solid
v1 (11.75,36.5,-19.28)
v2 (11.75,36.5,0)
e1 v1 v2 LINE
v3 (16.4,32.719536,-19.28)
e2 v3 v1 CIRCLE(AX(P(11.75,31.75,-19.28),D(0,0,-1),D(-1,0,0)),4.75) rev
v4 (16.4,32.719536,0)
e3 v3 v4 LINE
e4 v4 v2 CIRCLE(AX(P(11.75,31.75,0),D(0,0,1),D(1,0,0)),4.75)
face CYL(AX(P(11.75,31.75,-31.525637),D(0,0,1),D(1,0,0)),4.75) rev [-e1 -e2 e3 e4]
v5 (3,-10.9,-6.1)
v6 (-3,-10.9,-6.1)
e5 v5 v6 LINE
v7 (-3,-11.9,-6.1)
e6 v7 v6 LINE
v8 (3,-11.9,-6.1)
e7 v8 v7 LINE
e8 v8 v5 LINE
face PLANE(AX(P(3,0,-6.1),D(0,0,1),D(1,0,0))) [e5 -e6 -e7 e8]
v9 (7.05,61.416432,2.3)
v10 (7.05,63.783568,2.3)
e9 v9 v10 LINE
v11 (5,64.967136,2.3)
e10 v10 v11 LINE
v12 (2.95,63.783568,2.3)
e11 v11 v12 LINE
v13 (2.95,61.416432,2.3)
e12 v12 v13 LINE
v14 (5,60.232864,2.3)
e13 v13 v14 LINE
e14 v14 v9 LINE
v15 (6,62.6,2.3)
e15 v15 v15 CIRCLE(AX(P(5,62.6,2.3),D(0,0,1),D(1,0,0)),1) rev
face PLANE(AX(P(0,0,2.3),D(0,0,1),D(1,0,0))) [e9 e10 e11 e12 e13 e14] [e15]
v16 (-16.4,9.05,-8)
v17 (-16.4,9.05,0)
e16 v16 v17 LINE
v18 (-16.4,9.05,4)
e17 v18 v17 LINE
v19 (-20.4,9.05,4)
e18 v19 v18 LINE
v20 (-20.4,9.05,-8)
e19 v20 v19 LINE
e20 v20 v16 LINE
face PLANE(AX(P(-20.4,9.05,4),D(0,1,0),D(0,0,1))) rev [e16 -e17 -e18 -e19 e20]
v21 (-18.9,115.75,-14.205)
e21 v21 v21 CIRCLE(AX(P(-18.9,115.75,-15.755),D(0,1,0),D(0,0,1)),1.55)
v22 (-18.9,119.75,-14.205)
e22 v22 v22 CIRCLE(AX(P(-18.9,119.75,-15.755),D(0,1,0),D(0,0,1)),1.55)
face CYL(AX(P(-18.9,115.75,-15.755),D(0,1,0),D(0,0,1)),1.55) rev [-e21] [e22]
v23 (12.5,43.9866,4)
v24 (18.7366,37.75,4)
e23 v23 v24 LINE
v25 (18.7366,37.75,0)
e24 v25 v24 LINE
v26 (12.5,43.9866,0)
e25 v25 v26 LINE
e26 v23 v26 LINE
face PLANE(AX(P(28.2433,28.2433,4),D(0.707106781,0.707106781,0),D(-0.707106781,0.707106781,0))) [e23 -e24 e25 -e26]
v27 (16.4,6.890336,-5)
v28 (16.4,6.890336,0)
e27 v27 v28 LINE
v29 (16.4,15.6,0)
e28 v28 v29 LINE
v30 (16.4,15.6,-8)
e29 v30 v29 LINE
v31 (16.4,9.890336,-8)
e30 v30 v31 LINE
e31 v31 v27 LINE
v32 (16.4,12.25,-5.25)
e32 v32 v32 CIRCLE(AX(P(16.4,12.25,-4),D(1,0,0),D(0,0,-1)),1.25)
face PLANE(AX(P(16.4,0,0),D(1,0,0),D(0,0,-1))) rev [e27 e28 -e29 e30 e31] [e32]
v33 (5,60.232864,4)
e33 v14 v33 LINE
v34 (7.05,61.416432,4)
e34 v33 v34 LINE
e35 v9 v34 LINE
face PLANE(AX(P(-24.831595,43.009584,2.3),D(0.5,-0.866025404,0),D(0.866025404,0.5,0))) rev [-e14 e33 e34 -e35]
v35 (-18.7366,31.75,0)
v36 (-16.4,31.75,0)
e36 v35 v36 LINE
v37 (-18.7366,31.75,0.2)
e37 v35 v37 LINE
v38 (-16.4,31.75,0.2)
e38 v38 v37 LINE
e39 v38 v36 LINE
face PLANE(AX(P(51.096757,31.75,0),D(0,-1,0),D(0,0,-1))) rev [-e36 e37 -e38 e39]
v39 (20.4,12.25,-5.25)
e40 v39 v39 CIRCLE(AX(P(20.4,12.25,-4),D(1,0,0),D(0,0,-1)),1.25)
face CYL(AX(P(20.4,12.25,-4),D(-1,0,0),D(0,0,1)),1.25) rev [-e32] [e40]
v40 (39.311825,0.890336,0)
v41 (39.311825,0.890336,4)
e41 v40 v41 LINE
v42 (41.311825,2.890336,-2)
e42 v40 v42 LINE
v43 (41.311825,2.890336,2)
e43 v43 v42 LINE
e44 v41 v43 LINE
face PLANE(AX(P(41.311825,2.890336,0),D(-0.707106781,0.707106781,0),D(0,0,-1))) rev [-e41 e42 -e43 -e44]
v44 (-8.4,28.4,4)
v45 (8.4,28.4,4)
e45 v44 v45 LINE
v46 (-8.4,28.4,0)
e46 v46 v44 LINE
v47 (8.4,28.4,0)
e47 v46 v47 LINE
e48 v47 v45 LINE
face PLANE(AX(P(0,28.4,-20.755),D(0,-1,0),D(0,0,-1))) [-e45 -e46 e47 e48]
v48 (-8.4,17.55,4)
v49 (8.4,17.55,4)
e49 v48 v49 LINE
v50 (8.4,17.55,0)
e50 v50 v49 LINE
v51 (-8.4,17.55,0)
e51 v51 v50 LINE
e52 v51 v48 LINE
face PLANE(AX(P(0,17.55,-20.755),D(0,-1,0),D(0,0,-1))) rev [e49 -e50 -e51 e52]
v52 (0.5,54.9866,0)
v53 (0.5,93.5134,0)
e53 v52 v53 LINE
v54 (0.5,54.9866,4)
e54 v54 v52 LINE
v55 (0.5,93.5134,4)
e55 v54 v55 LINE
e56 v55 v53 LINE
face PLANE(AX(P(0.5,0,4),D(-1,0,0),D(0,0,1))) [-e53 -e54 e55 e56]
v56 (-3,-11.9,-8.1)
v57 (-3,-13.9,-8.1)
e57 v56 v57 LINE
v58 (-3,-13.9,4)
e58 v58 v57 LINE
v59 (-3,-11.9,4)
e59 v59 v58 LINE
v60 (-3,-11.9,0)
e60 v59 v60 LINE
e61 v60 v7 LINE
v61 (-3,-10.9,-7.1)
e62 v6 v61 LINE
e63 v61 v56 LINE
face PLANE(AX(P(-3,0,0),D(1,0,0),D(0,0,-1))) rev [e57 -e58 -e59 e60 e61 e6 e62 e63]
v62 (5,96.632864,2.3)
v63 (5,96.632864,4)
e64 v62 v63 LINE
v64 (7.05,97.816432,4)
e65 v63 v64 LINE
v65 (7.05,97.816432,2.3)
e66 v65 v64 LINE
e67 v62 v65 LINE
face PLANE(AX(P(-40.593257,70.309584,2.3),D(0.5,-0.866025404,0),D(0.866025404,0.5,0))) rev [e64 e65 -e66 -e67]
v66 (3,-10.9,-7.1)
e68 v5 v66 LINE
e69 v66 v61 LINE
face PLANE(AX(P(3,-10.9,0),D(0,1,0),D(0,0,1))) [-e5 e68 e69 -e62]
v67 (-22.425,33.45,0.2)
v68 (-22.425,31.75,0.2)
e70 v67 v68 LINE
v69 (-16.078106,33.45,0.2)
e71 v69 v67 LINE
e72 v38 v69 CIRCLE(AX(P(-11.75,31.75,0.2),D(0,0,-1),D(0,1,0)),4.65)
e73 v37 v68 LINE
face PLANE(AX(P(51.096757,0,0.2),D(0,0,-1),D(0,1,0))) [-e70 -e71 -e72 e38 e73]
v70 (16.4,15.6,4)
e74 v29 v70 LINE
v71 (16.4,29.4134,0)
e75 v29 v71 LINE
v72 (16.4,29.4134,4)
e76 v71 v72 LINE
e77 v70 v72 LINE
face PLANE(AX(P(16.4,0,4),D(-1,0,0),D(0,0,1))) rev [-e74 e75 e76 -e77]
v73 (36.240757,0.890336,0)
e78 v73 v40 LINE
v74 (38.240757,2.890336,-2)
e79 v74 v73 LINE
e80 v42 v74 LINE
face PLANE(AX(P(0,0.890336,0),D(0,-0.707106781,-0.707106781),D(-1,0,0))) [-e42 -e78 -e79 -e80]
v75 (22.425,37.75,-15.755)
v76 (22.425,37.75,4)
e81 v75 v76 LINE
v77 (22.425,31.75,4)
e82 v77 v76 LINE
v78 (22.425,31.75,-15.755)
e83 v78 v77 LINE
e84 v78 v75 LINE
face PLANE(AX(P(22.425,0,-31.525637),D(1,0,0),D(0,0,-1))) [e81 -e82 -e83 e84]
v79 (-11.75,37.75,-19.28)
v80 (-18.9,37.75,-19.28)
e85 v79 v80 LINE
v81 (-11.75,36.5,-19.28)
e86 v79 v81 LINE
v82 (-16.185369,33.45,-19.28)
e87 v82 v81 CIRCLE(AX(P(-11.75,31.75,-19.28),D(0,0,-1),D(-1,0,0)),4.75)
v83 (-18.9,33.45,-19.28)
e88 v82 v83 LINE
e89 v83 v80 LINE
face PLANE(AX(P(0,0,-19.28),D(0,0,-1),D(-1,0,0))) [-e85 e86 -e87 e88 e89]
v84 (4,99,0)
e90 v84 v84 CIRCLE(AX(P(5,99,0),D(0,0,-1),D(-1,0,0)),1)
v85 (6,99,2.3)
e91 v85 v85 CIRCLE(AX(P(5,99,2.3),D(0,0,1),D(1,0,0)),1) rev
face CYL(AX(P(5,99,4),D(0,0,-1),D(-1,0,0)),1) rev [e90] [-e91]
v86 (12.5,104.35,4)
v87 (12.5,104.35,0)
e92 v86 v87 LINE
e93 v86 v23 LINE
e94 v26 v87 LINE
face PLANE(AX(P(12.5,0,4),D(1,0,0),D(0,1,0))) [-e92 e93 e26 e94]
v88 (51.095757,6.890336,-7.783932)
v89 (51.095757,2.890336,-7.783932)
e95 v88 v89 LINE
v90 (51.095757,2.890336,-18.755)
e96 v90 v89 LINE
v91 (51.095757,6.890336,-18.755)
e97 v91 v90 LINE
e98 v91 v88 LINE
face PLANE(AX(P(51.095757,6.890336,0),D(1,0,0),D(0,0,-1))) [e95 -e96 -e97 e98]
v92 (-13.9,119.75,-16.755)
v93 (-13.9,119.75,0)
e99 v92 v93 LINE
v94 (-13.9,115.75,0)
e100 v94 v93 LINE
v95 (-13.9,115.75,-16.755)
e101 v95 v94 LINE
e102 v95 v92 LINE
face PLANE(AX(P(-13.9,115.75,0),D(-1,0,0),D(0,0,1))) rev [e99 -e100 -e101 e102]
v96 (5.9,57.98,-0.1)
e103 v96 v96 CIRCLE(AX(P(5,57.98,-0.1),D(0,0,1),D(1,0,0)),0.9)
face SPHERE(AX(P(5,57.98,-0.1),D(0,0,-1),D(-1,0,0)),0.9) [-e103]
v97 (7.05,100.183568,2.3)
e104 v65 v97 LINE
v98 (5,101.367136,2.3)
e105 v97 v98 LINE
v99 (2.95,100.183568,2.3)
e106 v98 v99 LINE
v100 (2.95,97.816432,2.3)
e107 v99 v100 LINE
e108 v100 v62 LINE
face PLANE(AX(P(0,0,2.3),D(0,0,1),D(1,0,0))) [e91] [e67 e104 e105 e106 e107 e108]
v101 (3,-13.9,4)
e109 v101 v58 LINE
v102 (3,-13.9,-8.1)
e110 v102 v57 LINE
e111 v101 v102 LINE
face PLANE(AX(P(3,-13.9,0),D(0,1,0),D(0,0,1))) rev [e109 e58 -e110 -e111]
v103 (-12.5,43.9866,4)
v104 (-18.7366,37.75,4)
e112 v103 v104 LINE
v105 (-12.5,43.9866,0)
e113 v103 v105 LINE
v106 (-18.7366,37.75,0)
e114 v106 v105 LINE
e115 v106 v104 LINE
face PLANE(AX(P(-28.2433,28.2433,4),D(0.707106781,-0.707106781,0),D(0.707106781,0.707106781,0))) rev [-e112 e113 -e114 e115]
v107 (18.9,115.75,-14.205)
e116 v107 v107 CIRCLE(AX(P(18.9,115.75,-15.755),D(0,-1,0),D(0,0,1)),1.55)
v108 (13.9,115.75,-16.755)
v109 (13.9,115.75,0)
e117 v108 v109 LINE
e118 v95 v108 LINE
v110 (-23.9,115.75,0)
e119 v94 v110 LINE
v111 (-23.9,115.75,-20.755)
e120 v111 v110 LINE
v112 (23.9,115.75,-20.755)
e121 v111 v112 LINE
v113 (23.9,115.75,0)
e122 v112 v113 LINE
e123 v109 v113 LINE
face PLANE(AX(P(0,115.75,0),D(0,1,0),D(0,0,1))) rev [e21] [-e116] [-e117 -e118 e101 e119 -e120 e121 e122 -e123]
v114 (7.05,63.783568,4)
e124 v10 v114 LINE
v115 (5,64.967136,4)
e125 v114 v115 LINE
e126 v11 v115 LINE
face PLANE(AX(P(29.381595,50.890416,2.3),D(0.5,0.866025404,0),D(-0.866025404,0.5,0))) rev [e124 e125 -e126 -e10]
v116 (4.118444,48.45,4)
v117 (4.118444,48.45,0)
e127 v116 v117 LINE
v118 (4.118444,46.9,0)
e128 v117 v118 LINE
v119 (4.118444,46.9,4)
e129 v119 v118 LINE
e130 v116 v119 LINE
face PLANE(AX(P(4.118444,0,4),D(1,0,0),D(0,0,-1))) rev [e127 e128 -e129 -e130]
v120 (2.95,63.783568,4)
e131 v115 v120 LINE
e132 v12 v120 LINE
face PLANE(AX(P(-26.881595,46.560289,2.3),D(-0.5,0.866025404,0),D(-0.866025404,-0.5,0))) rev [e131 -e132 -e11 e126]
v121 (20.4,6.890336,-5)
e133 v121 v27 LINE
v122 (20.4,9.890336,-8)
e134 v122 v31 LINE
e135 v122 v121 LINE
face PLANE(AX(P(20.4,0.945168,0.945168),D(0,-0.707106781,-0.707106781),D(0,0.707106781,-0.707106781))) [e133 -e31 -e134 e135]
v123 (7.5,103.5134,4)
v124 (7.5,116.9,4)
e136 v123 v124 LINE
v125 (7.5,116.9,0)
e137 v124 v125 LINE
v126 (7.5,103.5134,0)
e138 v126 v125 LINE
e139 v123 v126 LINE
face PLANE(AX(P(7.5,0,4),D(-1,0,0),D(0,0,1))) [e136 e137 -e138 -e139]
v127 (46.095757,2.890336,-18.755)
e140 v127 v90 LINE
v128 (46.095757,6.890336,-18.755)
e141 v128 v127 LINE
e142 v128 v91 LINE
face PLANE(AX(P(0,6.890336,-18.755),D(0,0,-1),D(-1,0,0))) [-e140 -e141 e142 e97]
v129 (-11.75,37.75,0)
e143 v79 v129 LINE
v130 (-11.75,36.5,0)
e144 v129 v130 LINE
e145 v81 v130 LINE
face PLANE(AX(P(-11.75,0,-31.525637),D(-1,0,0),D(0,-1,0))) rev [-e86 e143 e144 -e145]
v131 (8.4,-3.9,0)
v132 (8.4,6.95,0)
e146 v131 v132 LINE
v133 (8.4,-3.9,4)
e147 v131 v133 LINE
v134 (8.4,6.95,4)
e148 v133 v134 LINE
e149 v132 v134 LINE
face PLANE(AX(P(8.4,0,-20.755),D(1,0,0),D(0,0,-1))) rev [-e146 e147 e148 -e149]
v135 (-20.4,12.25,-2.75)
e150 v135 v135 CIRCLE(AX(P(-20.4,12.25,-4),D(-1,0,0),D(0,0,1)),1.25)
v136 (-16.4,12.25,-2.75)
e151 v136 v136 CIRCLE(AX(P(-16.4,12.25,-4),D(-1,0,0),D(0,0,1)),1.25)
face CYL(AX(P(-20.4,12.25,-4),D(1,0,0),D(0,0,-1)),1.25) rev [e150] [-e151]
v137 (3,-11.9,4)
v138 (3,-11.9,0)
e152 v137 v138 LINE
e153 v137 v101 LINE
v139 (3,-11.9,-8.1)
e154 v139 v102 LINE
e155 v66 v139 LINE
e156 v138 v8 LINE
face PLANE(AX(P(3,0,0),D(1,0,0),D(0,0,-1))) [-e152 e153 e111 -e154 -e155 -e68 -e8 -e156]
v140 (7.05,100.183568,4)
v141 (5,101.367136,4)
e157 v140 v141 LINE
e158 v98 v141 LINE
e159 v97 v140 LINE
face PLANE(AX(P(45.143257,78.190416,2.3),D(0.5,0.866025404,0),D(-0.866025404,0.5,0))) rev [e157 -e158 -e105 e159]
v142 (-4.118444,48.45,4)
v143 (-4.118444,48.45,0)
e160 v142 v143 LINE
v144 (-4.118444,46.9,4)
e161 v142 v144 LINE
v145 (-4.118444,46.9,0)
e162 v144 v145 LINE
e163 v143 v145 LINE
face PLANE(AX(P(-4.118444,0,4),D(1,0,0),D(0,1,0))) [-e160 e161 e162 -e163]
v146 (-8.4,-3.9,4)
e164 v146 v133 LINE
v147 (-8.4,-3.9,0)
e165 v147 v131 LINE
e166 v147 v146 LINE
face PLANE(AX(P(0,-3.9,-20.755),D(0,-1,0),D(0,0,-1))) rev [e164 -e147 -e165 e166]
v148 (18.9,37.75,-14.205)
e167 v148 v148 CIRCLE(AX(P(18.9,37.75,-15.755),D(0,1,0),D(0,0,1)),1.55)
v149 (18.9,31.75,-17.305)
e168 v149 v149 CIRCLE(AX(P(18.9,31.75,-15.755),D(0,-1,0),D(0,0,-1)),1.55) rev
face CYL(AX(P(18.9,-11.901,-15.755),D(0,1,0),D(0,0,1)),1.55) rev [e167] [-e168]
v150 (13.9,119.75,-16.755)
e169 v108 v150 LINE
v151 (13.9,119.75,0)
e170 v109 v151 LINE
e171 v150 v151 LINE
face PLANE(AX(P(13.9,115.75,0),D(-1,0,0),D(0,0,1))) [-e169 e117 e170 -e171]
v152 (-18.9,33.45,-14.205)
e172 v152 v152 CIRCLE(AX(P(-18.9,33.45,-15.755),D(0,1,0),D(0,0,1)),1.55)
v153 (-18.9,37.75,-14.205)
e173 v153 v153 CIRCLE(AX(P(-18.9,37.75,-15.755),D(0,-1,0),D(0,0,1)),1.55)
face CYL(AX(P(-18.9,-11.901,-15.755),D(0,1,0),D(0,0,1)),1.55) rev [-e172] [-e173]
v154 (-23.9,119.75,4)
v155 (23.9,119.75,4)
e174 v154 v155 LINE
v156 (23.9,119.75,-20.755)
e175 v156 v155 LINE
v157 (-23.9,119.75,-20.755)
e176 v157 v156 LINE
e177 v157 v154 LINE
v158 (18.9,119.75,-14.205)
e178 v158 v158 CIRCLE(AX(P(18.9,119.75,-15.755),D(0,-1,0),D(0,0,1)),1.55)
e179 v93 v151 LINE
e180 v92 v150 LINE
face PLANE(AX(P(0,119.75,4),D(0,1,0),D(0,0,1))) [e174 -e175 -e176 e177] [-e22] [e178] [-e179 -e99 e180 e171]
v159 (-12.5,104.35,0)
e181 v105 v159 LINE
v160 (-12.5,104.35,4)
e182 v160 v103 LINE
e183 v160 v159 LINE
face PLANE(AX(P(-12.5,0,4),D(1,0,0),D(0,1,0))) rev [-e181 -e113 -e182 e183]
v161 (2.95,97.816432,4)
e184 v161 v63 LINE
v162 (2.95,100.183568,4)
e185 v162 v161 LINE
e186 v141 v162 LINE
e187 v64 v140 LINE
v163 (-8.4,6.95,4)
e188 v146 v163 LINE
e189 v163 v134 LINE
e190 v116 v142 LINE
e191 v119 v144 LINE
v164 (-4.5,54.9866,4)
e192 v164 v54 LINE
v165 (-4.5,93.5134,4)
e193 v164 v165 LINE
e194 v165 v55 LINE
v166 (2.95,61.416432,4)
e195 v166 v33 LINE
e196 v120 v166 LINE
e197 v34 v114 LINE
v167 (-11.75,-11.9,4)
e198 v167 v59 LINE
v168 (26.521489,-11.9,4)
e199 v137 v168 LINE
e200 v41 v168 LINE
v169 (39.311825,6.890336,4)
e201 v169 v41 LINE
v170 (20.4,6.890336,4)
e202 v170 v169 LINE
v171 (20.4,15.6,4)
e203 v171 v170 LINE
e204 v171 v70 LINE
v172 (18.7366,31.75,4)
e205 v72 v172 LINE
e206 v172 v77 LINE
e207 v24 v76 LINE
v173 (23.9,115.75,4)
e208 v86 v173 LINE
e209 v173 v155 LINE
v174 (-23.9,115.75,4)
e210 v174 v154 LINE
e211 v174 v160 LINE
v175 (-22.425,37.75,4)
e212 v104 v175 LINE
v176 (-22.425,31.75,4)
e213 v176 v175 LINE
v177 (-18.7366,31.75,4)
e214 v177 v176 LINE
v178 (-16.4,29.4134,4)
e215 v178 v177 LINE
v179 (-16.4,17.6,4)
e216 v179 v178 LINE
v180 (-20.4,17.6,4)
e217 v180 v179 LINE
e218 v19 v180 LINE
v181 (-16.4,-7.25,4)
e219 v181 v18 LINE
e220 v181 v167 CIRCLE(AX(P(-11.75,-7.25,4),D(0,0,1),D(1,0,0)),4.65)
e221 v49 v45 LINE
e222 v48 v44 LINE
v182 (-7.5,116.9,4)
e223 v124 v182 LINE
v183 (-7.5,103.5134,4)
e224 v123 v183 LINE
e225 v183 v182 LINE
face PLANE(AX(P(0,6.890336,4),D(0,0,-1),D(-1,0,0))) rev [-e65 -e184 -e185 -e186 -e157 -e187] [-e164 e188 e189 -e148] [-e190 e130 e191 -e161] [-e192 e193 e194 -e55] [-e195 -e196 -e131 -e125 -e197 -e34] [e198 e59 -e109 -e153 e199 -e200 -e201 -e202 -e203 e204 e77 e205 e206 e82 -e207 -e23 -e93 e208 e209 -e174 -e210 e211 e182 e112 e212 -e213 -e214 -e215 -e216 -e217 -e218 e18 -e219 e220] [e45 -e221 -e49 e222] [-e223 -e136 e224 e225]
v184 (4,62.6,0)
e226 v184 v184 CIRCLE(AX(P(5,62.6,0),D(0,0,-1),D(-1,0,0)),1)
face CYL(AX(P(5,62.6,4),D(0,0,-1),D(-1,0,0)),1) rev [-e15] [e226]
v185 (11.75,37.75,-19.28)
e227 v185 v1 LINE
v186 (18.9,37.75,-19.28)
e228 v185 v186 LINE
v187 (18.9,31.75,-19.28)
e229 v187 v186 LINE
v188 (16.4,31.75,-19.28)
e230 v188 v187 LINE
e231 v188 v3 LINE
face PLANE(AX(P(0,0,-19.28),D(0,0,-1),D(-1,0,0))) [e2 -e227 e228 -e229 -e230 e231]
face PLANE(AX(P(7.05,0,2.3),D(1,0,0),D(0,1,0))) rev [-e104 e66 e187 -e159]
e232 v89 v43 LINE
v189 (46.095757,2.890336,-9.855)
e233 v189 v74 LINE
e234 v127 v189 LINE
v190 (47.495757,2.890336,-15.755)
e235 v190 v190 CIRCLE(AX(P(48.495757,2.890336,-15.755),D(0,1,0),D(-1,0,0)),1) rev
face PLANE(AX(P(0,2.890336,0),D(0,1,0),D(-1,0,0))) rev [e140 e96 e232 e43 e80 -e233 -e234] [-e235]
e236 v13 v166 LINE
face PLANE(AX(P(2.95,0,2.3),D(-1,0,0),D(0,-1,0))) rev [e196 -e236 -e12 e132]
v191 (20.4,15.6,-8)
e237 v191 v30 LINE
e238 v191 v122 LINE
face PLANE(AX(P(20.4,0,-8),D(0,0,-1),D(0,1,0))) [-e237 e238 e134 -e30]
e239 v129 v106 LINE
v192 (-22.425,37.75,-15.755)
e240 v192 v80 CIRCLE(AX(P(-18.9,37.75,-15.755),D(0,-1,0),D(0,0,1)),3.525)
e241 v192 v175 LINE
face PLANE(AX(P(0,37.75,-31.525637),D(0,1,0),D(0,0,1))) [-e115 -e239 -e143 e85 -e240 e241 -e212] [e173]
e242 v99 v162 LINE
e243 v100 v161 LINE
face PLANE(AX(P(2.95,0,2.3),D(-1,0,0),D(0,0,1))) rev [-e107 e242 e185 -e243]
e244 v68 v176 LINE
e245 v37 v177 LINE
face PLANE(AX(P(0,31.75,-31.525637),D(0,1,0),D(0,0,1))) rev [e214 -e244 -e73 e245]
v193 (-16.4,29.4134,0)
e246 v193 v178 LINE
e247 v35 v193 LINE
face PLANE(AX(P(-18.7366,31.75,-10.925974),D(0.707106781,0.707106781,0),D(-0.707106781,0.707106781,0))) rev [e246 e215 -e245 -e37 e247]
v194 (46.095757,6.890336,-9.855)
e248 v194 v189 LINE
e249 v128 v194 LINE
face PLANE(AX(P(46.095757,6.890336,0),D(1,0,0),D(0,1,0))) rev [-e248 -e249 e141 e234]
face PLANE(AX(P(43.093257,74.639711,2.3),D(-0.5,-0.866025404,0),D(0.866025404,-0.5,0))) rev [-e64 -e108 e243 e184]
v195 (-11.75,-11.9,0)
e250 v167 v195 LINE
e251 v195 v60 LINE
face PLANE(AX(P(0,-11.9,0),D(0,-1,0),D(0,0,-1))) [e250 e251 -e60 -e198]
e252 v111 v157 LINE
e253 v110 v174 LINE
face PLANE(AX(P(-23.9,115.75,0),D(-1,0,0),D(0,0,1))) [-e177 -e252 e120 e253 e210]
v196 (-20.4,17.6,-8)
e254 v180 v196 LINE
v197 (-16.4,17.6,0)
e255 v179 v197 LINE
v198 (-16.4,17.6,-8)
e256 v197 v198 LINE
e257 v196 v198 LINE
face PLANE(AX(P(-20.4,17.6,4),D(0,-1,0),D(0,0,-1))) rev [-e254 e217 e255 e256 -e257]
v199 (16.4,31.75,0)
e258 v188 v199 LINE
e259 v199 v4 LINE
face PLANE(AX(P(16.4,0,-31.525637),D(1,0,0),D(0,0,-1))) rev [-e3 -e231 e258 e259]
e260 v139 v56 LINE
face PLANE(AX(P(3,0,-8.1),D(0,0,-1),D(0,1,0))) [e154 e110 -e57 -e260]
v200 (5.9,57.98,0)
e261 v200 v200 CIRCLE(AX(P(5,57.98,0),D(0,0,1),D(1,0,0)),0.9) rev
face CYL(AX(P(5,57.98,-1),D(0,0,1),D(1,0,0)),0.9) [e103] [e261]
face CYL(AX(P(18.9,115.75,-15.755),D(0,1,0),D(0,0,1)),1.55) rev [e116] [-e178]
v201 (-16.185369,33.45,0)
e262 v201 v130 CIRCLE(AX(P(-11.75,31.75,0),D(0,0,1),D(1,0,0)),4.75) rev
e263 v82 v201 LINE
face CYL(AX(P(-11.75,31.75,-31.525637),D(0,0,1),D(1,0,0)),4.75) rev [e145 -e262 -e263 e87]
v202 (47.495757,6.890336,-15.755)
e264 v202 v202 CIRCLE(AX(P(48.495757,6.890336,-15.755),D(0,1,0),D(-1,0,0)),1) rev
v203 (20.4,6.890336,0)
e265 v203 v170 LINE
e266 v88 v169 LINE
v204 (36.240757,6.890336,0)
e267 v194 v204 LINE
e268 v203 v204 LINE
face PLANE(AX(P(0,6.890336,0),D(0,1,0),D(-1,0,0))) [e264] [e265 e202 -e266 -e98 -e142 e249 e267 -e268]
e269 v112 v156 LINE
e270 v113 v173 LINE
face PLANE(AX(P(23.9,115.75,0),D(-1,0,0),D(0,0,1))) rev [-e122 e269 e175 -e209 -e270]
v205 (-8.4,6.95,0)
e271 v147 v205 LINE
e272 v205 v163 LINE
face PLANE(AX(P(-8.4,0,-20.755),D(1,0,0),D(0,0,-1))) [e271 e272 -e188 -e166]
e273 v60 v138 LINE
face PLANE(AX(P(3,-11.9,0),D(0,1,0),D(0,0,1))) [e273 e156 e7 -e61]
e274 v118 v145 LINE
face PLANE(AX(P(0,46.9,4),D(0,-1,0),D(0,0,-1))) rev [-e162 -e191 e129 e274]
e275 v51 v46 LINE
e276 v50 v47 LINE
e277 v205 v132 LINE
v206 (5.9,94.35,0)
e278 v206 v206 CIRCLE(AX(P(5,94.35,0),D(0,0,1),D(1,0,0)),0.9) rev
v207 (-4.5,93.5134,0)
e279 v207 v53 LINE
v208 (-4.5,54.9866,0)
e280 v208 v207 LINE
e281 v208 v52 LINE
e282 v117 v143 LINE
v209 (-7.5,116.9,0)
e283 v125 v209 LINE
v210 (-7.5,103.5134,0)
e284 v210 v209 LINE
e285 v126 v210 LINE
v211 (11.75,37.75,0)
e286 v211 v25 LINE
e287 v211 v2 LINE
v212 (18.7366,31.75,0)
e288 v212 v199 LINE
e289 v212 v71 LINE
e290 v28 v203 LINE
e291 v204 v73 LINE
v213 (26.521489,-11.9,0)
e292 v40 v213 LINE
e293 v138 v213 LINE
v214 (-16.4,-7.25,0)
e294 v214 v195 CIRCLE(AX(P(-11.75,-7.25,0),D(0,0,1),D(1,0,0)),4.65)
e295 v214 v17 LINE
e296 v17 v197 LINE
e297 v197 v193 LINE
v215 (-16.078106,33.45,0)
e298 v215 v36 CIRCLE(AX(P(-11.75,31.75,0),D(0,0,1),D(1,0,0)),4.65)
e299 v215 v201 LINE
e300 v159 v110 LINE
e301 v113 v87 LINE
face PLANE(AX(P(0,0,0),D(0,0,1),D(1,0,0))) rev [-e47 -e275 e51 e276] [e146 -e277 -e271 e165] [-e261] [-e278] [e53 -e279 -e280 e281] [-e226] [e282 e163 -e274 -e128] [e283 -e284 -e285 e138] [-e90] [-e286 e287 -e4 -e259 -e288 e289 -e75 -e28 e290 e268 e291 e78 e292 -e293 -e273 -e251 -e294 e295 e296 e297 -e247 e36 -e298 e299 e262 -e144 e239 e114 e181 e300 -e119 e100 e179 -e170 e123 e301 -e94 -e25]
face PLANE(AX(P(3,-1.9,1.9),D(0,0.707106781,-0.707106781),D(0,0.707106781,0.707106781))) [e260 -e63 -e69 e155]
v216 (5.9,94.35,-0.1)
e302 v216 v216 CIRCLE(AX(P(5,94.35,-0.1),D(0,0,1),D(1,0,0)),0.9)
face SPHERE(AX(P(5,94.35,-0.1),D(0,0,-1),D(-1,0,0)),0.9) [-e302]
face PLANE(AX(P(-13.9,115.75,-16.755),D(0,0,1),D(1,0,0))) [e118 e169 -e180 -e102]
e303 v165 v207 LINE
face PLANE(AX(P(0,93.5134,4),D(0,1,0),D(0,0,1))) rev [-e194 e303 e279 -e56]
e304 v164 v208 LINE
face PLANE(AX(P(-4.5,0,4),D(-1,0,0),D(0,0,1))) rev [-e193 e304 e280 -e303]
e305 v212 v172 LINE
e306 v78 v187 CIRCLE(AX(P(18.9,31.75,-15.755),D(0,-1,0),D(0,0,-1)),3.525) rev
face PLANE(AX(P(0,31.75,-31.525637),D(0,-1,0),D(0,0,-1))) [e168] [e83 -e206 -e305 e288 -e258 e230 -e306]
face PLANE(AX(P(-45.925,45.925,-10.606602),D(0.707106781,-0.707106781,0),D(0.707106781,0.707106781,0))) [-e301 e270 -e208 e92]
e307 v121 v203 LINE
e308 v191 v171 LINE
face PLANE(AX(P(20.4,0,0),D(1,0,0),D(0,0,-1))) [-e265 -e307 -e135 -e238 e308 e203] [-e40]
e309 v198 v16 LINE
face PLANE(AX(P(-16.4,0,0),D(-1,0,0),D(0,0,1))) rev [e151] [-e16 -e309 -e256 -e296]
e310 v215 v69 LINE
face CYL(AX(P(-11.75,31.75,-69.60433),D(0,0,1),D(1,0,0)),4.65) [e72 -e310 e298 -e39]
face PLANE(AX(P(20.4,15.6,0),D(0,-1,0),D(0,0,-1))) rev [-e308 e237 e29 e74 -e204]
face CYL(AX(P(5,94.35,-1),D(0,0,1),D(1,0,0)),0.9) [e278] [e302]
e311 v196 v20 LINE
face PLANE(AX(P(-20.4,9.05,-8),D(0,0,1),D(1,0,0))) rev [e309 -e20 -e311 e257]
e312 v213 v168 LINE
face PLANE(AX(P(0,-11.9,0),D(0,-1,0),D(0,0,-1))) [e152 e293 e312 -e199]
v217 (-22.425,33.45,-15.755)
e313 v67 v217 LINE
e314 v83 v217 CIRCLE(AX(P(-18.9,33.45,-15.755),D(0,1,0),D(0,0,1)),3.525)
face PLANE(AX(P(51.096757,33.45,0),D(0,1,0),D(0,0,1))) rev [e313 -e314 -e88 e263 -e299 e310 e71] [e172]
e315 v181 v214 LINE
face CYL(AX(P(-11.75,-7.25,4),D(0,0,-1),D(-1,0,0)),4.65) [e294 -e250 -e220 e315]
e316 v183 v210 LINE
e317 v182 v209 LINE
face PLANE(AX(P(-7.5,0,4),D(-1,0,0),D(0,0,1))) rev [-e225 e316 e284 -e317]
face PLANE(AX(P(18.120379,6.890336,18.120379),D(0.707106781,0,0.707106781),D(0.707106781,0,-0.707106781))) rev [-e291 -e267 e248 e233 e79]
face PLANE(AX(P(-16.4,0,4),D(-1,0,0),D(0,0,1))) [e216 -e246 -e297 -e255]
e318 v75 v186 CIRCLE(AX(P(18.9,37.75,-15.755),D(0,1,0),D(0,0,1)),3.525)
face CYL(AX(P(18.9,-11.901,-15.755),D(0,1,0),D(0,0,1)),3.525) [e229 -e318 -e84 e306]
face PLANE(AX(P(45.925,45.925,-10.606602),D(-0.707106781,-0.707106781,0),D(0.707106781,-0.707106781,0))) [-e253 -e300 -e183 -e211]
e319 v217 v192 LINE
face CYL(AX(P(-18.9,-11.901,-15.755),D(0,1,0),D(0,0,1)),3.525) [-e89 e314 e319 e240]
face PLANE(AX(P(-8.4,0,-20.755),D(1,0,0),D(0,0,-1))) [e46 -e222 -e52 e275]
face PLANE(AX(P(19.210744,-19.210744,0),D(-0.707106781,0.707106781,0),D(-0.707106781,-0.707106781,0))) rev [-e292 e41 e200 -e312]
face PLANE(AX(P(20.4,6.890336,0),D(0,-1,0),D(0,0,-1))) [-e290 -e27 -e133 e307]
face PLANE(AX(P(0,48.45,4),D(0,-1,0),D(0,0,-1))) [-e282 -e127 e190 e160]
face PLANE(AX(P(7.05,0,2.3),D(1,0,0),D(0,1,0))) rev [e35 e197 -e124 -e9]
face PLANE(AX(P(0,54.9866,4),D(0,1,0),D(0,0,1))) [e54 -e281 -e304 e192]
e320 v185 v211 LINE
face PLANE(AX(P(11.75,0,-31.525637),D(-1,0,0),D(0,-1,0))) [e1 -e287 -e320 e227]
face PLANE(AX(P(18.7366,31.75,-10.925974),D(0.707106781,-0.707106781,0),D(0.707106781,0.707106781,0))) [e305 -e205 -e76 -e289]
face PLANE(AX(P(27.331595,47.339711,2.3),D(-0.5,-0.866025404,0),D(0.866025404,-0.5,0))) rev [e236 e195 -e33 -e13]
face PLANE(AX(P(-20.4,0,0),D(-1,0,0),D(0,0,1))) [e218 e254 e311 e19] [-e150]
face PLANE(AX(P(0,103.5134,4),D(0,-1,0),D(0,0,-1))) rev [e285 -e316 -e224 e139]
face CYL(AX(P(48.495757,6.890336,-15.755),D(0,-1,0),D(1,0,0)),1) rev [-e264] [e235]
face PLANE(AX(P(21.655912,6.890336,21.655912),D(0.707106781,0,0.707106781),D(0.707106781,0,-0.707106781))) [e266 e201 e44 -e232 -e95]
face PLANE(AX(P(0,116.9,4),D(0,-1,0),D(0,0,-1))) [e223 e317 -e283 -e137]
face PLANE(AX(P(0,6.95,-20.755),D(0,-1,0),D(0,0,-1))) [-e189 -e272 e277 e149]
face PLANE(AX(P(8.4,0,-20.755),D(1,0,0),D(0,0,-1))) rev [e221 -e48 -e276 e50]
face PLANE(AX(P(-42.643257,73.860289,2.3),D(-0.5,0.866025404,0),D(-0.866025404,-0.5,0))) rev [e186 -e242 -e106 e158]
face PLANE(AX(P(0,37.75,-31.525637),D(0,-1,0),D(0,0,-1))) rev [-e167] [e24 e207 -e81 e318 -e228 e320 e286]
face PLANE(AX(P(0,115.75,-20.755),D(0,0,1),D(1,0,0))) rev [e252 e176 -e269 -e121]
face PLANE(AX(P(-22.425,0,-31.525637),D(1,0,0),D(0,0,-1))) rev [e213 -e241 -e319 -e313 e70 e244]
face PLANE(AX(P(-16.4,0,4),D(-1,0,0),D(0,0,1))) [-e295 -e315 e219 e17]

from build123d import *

# Parameters (mm, degrees)
EXTRUDE_1_DEPTH     = 4
SKETCH_2_W          = 15
SKETCH_2_H          = 13.3866
CUT_EXTRUDE_1_DEPTH = 121.93395925
SKETCH_3_W          = 10
SKETCH_3_H          = 10
SKETCH_3_R          = 1.55
SKETCH_3_H_2        = 14.755
EXTRUDE_2_DEPTH     = 4
EXTRUDE_3_DEPTH     = 4
EXTRUDE_4_DEPTH     = 4
SKETCH_7_W          = 27.8
SKETCH_7_H          = 4
EXTRUDE_5_DEPTH     = 4
EXTRUDE_START       = -4
EXTRUDE_6_DEPTH     = 4
SKETCH_11_W         = 16.8
SKETCH_11_H         = 10.85
CUT_EXTRUDE_2_DEPTH = 133.52791749
CHAMFER_1_SIZE      = 2
CHAMFER_2_SIZE      = 2
SKETCH_12_W         = 12
SKETCH_12_H         = 8.55
SKETCH_12_R         = 1.25
EXTRUDE_7_DEPTH     = 4
EXTRUDE_START_2     = 4
SKETCH_13_R         = 1.25
SKETCH_13_W         = 4
SKETCH_13_H         = 8.709663749
EXTRUDE_8_DEPTH     = 4
SKETCH_14_R         = 1
CUT_EXTRUDE_3_DEPTH = 132.839329922
SKETCH_15_R         = 0.9
EXTRUDE_9_DEPTH     = 1
FILLET_1_R          = 0.9
CUT_EXTRUDE_START   = -1.7
SKETCH_16_R         = 1
CUT_EXTRUDE_4_DEPTH = 1.7
CUT_EXTRUDE_5_DEPTH = 132.839329922
SKETCH_19_W         = 5
SKETCH_19_H         = 38.5268
SKETCH_19_W_2       = 8.236887868
SKETCH_19_H_2       = 1.55
CUT_EXTRUDE_6_DEPTH = 132.839329922
EXTRUDE_12_DEPTH    = 23.28
CUT_EXTRUDE_7_REACH = 100.821
SKETCH_23_R         = 1.55
EXTRUDE_13_DEPTH    = 4
CUT_EXTRUDE_START_2 = -19.28
CUT_EXTRUDE_8_DEPTH = 19.48
SKETCH_26_W         = 10.1
SKETCH_26_H         = 2
EXTRUDE_14_DEPTH    = 3


# Read off the part's stored shape, not the designer's step: 切除-拉伸8
with BuildPart() as part:
    # 草图1 → 凸台-拉伸1 (new body)
    with BuildSketch(Plane.XY):
        with BuildLine():
            Line((-16.4, -7.25), (-16.4, 119.75))
            Line((-16.4, 119.75), (16.4, 119.75))
            Line((16.4, 119.75), (16.4, -7.25))
            ThreePointArc((16.4, -7.25), (15.038046533, -10.538046533), (11.75, -11.9))
            Line((11.75, -11.9), (-11.75, -11.9))
            ThreePointArc((-11.75, -11.9), (-15.038046533, -10.538046533), (-16.4, -7.25))
        make_face()
    extrude(amount=EXTRUDE_1_DEPTH)

    # 草图2 → 切除-拉伸1 (cut, through all)
    with BuildSketch(Plane(origin=(0, 0, 0), x_dir=(-1, 0, 0), z_dir=(0, 0, -1))):
        with Locations((0, 110.2067)):
            Rectangle(SKETCH_2_W, SKETCH_2_H)
    extrude(amount=-CUT_EXTRUDE_1_DEPTH, mode=Mode.SUBTRACT)

    # 草图3 → 凸台-拉伸2 (add)
    # profile 1 of 2: a face of its own
    with BuildSketch(Plane(origin=(0, 119.75, 0), x_dir=(1, 0, 0), z_dir=(0, 1, 0))):
        with Locations((-18.9, 15.755)):
            Rectangle(SKETCH_3_W, SKETCH_3_H)
        with Locations(Location((-18.9, 15.755, 0), (0, 0, 270))):
            Circle(SKETCH_3_R, mode=Mode.SUBTRACT)
    # profile 2 of 2: a face of its own
    with BuildSketch(Plane(origin=(0, 119.75, 0), x_dir=(1, 0, 0), z_dir=(0, 1, 0))):
        with Locations((-18.9, 3.3775)):
            Rectangle(SKETCH_3_W, SKETCH_3_H_2)
    extrude_2 = extrude(amount=-EXTRUDE_2_DEPTH)

    # 镜向1: 凸台-拉伸2 across plane
    add(extrude_2.mirror(Plane(origin=(0, 0, 0), x_dir=(0, 0, 1), z_dir=(1, 0, 0))))

    # 草图6 → 凸台-拉伸4 (add)
    with BuildSketch(Plane.XY.offset(4)):
        Polygon((-16.4, 115.75), (-23.9, 115.75), (-16.4, 108.25), align=None)
        Polygon((16.4, 115.75), (16.4, 108.25), (23.9, 115.75), align=None)
    extrude(amount=-EXTRUDE_4_DEPTH)

    # 草图7 → 凸台-拉伸5 (add)
    with BuildSketch(Plane(origin=(0, 119.75, 0), x_dir=(1, 0, 0), z_dir=(0, 1, 0))):
        with Locations((0, 18.755)):
            Rectangle(SKETCH_7_W, SKETCH_7_H)
    extrude(amount=-EXTRUDE_5_DEPTH)



with BuildPart() as body_2:
    # 草图5 → 凸台-拉伸3 (new body)
    with BuildSketch(Plane(origin=(0, 2.890336251, 0), x_dir=(1, 0, 0), z_dir=(0, 1, 0))):
        Polygon((50.795757056, 9.855), (46.095757056, 9.855), (32.240757056, -4), (39.311824868, -4), (51.095757056, 7.783932188), (51.095757056, 9.855), align=None)
        with BuildLine():
            Line((50.795757056, 18.755), (46.095757056, 18.755))
            Line((46.095757056, 18.755), (46.095757056, 9.855))
            Line((46.095757056, 9.855), (50.795757056, 9.855))
            Line((50.795757056, 9.855), (50.795757056, 15.105))
            Line((50.795757056, 15.105), (49.255691264, 15.105))
            ThreePointArc((49.255691264, 15.105), (47.495757056, 15.755), (49.255691264, 16.405))
            Line((49.255691264, 16.405), (50.795757056, 16.405))
            Line((50.795757056, 16.405), (50.795757056, 18.755))
        make_face()
        with BuildLine():
            Line((51.095757056, 18.755), (50.795757056, 18.755))
            Line((50.795757056, 18.755), (50.795757056, 16.405))
            Line((50.795757056, 16.405), (49.255691264, 16.405))
            ThreePointArc((49.255691264, 16.405), (49.433822674, 16.10145764), (49.495757056, 15.755))
            ThreePointArc((49.495757056, 15.755), (49.433822674, 15.40854236), (49.255691264, 15.105))
            Line((49.255691264, 15.105), (50.795757056, 15.105))
            Line((50.795757056, 15.105), (50.795757056, 9.855))
            Line((50.795757056, 9.855), (51.095757056, 9.855))
            Line((51.095757056, 9.855), (51.095757056, 18.755))
        make_face()
    extrude(amount=EXTRUDE_3_DEPTH)


with BuildPart() as part_1:
    add(part.part)

    add(body_2.part)  # 凸台-拉伸6 merges body 2
    # 草图8 → 凸台-拉伸6 (add)
    with BuildSketch(Plane.XY.offset(4).offset(EXTRUDE_START)):
        with BuildLine():
            Line((26.521488617, -11.9), (39.311824868, 0.890336251))
            Line((39.311824868, 0.890336251), (39.311824868, 6.890336251))
            Line((39.311824868, 6.890336251), (16.4, 6.890336251))
            Line((16.4, 6.890336251), (16.4, -7.25))
            ThreePointArc((16.4, -7.25), (15.038046533, -10.538046533), (11.75, -11.9))
            Line((11.75, -11.9), (26.521488617, -11.9))
        make_face()
    extrude(amount=EXTRUDE_6_DEPTH)

    # 草图11 → 切除-拉伸2 (cut, through all)
    with BuildSketch(Plane.XY.offset(4)):
        with Locations((0, 1.525)):
            Rectangle(SKETCH_11_W, SKETCH_11_H)
        with Locations((0, 22.975)):
            Rectangle(SKETCH_11_W, SKETCH_11_H)
    extrude(amount=-CUT_EXTRUDE_2_DEPTH, mode=Mode.SUBTRACT)

    # 倒角1
    chamfer_1_edges = [part_1.edges().sort_by_distance(p)[0] for p in [
        (39.311824868, 2.890336251, 2),
    ]]
    chamfer(chamfer_1_edges, length=CHAMFER_1_SIZE - 0.0001)  # a hair under: the kernel refuses the full size

    # 倒角2
    chamfer_2_edges = [part_1.edges().sort_by_distance(p)[0] for p in [
        (38.776240962, 2.890336251, 0),
    ]]
    chamfer(chamfer_2_edges, length=CHAMFER_2_SIZE - 0.0001)  # a hair under: the kernel refuses the full size

    # 草图12 → 凸台-拉伸7 (add)
    with BuildSketch(Plane.ZY.offset(16.4)):
        with Locations((-2, 13.325)):
            Rectangle(SKETCH_12_W, SKETCH_12_H)
        with Locations((-4, 12.25)):
            Circle(SKETCH_12_R, mode=Mode.SUBTRACT)
    extrude(amount=EXTRUDE_7_DEPTH)

    # 草图13 → 凸台-拉伸8 (add)
    # profile 1 of 2: a face of its own
    with BuildSketch(Plane(origin=(16.4, 0, 0), x_dir=(0, 0, -1), z_dir=(1, 0, 0)).offset(EXTRUDE_START_2)):
        Polygon((8, 9.890336251), (8, 15.6), (0, 15.6), (0, 6.890336251), (5, 6.890336251), align=None)
        with Locations(Location((4, 12.25, 0), (0, 0, 180))):
            Circle(SKETCH_13_R, mode=Mode.SUBTRACT)
    # profile 2 of 2: a face of its own
    with BuildSketch(Plane(origin=(16.4, 0, 0), x_dir=(0, 0, -1), z_dir=(1, 0, 0)).offset(EXTRUDE_START_2)):
        with Locations((-2, 11.245168126)):
            Rectangle(SKETCH_13_W, SKETCH_13_H)
    extrude(amount=-EXTRUDE_8_DEPTH)

    # 草图14 → 切除-拉伸3 (cut, through all)
    with BuildSketch(Plane(origin=(0, 0, 0), x_dir=(-1, 0, 0), z_dir=(0, 0, -1))):
        with Locations((-5, 62.6)):
            Circle(SKETCH_14_R)
        with Locations((-5, 99)):
            Circle(SKETCH_14_R)
    extrude(amount=-CUT_EXTRUDE_3_DEPTH, mode=Mode.SUBTRACT)

    # 草图15 → 凸台-拉伸9 (add)
    with BuildSketch(Plane(origin=(0, 0, 0), x_dir=(-1, 0, 0), z_dir=(0, 0, -1))):
        with Locations(Location((-5, 94.35, 0), (0, 0, 180))):
            Circle(SKETCH_15_R)
        with Locations(Location((-5, 57.98, 0), (0, 0, 180))):
            Circle(SKETCH_15_R)
    extrude(amount=EXTRUDE_9_DEPTH)

    # 圆角1
    fillet_1_edges = [part_1.edges().sort_by_distance(p)[0] for p in [
        (4.1, 94.35, -1),
        (4.1, 57.98, -1),
    ]]
    fillet(fillet_1_edges, radius=FILLET_1_R)

    # 草图16 → 切除-拉伸4 (cut)
    # profile 1 of 2: a face of its own
    with BuildSketch(Plane.XY.offset(4).offset(CUT_EXTRUDE_START)):
        Polygon((7.05, 61.416431948), (7.05, 63.783568052), (5, 64.967136104), (2.95, 63.783568052), (2.95, 61.416431948), (5, 60.232863896), align=None)
        with Locations(Location((5, 62.6, 0), (0, 0, 180))):
            Circle(SKETCH_16_R, mode=Mode.SUBTRACT)
    # profile 2 of 2: a face of its own
    with BuildSketch(Plane.XY.offset(4).offset(CUT_EXTRUDE_START)):
        Polygon((2.95, 97.816431948), (5, 96.632863896), (7.05, 97.816431948), (7.05, 100.183568052), (5, 101.367136104), (2.95, 100.183568052), align=None)
        with Locations(Location((5, 99, 0), (0, 0, 180))):
            Circle(SKETCH_16_R, mode=Mode.SUBTRACT)
    extrude(amount=CUT_EXTRUDE_4_DEPTH, mode=Mode.SUBTRACT)

    # 草图17 → 切除-拉伸5 (cut, symmetric)
    with BuildSketch(Plane(origin=(0, 0, 0), x_dir=(-1, 0, 0), z_dir=(0, 0, -1))):
        Polygon((-12.5, 104.35), (-16.4, 108.25), (-16.4, 40.0866), (-12.5, 43.9866), align=None)
    cut_extrude_5 = extrude(amount=CUT_EXTRUDE_5_DEPTH, both=True, mode=Mode.SUBTRACT)

    # 镜向2: 切除-拉伸5 across plane
    add(cut_extrude_5.mirror(Plane(origin=(0, 0, 0), x_dir=(0, 0, 1), z_dir=(1, 0, 0))), mode=Mode.SUBTRACT)

    # 草图19 → 切除-拉伸6 (cut, through all)
    with BuildSketch(Plane(origin=(0, 0, 0), x_dir=(-1, 0, 0), z_dir=(0, 0, -1))):
        with Locations((2, 74.25)):
            Rectangle(SKETCH_19_W, SKETCH_19_H)
        with Locations((0, 47.675)):
            Rectangle(SKETCH_19_W_2, SKETCH_19_H_2)
    extrude(amount=-CUT_EXTRUDE_6_DEPTH, mode=Mode.SUBTRACT)

    # 草图22 → 凸台-拉伸12 (add)
    with BuildSketch(Plane.XY.offset(4)):
        with BuildLine():
            Line((16.4, 32.719535971), (16.4, 31.75))
            Line((16.4, 31.75), (22.425, 31.75))
            Line((22.425, 31.75), (22.425, 37.75))
            Line((22.425, 37.75), (11.75, 37.75))
            Line((11.75, 37.75), (11.75, 36.5))
            ThreePointArc((11.75, 36.5), (14.746431556, 35.435633993), (16.4, 32.719535971))
        make_face()
    extrude_12 = extrude(amount=-EXTRUDE_12_DEPTH)

    # 草图23 → 切除-拉伸7 (cut, up to next)
    with BuildSketch(Plane(origin=(0, 37.75, 0), x_dir=(1, 0, 0), z_dir=(0, 1, 0)), mode=Mode.PRIVATE) as cut_extrude_7_sk1:
        with Locations(Location((18.9, 15.755, 0), (0, 0, 270))):
            Circle(SKETCH_23_R)
    cut_extrude_7_tool1 = extrude(cut_extrude_7_sk1.sketch, amount=-CUT_EXTRUDE_7_REACH, mode=Mode.PRIVATE) & part_1.part
    # 草图23 → 切除-拉伸7 (cut, up to next)
    with BuildSketch(Plane(origin=(0, 37.75, 0), x_dir=(1, 0, 0), z_dir=(0, 1, 0)), mode=Mode.PRIVATE) as cut_extrude_7_sk2:
        with BuildLine():
            ThreePointArc((18.9, 19.28), (21.392551404, 18.247551403), (22.425, 15.754999999))
            Line((22.425, 15.754999999), (22.425, 19.28))
            Line((22.425, 19.28), (18.9, 19.28))
        make_face()
    cut_extrude_7_tool2 = extrude(cut_extrude_7_sk2.sketch, amount=-CUT_EXTRUDE_7_REACH, mode=Mode.PRIVATE) & part_1.part
    cut_extrude_7_1 = cut_extrude_7_tool1.solids().sort_by_distance((18.9, 37.75, -15.755))[0]
    add(cut_extrude_7_1, mode=Mode.SUBTRACT)
    cut_extrude_7_2 = cut_extrude_7_tool2.solids().sort_by_distance((21.637628, 37.75, -18.492628))[0]
    add(cut_extrude_7_2, mode=Mode.SUBTRACT)
    cut_extrude_7 = cut_extrude_7_1 + cut_extrude_7_2  # 切除-拉伸7 as one shape, for the pattern or mirror that repeats it

    # 草图24 → 凸台-拉伸13 (add)
    with BuildSketch(Plane.XY.offset(4)):
        Polygon((16.4, 40.0866), (18.7366, 37.75), (18.7366, 31.75), (16.4, 29.4134), align=None)
    extrude_13 = extrude(amount=-EXTRUDE_13_DEPTH)

    # 镜向3: 凸台-拉伸12, 切除-拉伸7, 凸台-拉伸13 across plane
    add(extrude_12.mirror(Plane(origin=(0, 0, 0), x_dir=(0, 0, 1), z_dir=(1, 0, 0))))
    add(cut_extrude_7.mirror(Plane(origin=(0, 0, 0), x_dir=(0, 0, 1), z_dir=(1, 0, 0))), mode=Mode.SUBTRACT)
    add(extrude_13.mirror(Plane(origin=(0, 0, 0), x_dir=(0, 0, 1), z_dir=(1, 0, 0))))

    # 切除-拉伸8 outline → 切除-拉伸8 (cut)
    with BuildSketch(Plane.XY.offset(CUT_EXTRUDE_START_2)):
        with BuildLine():
            ThreePointArc((-16.4, 31.75), (-16.318817794, 32.615103442), (-16.078105821, 33.45))
            Line((-16.078105821, 33.45), (-22.425, 33.45))
            Line((-22.425, 33.45), (-22.425, 31.75))
            Line((-22.425, 31.75), (-16.4, 31.75))
        make_face()
    extrude(amount=CUT_EXTRUDE_8_DEPTH, mode=Mode.SUBTRACT)

    # 草图26 → 凸台-拉伸14 (add, symmetric)
    with BuildSketch(Plane(origin=(0, 0, 0), x_dir=(0, 0, -1), z_dir=(1, 0, 0))):
        with Locations((1.05, -12.9)):
            Rectangle(SKETCH_26_W, SKETCH_26_H)
        Polygon((8.1, -11.9), (8.1, -13.9), (6.1, -13.9), (6.1, -11.9), (6.1, -10.9), (7.1, -10.9), align=None)
    extrude(amount=EXTRUDE_14_DEPTH, both=True)


solid = part_1.part
